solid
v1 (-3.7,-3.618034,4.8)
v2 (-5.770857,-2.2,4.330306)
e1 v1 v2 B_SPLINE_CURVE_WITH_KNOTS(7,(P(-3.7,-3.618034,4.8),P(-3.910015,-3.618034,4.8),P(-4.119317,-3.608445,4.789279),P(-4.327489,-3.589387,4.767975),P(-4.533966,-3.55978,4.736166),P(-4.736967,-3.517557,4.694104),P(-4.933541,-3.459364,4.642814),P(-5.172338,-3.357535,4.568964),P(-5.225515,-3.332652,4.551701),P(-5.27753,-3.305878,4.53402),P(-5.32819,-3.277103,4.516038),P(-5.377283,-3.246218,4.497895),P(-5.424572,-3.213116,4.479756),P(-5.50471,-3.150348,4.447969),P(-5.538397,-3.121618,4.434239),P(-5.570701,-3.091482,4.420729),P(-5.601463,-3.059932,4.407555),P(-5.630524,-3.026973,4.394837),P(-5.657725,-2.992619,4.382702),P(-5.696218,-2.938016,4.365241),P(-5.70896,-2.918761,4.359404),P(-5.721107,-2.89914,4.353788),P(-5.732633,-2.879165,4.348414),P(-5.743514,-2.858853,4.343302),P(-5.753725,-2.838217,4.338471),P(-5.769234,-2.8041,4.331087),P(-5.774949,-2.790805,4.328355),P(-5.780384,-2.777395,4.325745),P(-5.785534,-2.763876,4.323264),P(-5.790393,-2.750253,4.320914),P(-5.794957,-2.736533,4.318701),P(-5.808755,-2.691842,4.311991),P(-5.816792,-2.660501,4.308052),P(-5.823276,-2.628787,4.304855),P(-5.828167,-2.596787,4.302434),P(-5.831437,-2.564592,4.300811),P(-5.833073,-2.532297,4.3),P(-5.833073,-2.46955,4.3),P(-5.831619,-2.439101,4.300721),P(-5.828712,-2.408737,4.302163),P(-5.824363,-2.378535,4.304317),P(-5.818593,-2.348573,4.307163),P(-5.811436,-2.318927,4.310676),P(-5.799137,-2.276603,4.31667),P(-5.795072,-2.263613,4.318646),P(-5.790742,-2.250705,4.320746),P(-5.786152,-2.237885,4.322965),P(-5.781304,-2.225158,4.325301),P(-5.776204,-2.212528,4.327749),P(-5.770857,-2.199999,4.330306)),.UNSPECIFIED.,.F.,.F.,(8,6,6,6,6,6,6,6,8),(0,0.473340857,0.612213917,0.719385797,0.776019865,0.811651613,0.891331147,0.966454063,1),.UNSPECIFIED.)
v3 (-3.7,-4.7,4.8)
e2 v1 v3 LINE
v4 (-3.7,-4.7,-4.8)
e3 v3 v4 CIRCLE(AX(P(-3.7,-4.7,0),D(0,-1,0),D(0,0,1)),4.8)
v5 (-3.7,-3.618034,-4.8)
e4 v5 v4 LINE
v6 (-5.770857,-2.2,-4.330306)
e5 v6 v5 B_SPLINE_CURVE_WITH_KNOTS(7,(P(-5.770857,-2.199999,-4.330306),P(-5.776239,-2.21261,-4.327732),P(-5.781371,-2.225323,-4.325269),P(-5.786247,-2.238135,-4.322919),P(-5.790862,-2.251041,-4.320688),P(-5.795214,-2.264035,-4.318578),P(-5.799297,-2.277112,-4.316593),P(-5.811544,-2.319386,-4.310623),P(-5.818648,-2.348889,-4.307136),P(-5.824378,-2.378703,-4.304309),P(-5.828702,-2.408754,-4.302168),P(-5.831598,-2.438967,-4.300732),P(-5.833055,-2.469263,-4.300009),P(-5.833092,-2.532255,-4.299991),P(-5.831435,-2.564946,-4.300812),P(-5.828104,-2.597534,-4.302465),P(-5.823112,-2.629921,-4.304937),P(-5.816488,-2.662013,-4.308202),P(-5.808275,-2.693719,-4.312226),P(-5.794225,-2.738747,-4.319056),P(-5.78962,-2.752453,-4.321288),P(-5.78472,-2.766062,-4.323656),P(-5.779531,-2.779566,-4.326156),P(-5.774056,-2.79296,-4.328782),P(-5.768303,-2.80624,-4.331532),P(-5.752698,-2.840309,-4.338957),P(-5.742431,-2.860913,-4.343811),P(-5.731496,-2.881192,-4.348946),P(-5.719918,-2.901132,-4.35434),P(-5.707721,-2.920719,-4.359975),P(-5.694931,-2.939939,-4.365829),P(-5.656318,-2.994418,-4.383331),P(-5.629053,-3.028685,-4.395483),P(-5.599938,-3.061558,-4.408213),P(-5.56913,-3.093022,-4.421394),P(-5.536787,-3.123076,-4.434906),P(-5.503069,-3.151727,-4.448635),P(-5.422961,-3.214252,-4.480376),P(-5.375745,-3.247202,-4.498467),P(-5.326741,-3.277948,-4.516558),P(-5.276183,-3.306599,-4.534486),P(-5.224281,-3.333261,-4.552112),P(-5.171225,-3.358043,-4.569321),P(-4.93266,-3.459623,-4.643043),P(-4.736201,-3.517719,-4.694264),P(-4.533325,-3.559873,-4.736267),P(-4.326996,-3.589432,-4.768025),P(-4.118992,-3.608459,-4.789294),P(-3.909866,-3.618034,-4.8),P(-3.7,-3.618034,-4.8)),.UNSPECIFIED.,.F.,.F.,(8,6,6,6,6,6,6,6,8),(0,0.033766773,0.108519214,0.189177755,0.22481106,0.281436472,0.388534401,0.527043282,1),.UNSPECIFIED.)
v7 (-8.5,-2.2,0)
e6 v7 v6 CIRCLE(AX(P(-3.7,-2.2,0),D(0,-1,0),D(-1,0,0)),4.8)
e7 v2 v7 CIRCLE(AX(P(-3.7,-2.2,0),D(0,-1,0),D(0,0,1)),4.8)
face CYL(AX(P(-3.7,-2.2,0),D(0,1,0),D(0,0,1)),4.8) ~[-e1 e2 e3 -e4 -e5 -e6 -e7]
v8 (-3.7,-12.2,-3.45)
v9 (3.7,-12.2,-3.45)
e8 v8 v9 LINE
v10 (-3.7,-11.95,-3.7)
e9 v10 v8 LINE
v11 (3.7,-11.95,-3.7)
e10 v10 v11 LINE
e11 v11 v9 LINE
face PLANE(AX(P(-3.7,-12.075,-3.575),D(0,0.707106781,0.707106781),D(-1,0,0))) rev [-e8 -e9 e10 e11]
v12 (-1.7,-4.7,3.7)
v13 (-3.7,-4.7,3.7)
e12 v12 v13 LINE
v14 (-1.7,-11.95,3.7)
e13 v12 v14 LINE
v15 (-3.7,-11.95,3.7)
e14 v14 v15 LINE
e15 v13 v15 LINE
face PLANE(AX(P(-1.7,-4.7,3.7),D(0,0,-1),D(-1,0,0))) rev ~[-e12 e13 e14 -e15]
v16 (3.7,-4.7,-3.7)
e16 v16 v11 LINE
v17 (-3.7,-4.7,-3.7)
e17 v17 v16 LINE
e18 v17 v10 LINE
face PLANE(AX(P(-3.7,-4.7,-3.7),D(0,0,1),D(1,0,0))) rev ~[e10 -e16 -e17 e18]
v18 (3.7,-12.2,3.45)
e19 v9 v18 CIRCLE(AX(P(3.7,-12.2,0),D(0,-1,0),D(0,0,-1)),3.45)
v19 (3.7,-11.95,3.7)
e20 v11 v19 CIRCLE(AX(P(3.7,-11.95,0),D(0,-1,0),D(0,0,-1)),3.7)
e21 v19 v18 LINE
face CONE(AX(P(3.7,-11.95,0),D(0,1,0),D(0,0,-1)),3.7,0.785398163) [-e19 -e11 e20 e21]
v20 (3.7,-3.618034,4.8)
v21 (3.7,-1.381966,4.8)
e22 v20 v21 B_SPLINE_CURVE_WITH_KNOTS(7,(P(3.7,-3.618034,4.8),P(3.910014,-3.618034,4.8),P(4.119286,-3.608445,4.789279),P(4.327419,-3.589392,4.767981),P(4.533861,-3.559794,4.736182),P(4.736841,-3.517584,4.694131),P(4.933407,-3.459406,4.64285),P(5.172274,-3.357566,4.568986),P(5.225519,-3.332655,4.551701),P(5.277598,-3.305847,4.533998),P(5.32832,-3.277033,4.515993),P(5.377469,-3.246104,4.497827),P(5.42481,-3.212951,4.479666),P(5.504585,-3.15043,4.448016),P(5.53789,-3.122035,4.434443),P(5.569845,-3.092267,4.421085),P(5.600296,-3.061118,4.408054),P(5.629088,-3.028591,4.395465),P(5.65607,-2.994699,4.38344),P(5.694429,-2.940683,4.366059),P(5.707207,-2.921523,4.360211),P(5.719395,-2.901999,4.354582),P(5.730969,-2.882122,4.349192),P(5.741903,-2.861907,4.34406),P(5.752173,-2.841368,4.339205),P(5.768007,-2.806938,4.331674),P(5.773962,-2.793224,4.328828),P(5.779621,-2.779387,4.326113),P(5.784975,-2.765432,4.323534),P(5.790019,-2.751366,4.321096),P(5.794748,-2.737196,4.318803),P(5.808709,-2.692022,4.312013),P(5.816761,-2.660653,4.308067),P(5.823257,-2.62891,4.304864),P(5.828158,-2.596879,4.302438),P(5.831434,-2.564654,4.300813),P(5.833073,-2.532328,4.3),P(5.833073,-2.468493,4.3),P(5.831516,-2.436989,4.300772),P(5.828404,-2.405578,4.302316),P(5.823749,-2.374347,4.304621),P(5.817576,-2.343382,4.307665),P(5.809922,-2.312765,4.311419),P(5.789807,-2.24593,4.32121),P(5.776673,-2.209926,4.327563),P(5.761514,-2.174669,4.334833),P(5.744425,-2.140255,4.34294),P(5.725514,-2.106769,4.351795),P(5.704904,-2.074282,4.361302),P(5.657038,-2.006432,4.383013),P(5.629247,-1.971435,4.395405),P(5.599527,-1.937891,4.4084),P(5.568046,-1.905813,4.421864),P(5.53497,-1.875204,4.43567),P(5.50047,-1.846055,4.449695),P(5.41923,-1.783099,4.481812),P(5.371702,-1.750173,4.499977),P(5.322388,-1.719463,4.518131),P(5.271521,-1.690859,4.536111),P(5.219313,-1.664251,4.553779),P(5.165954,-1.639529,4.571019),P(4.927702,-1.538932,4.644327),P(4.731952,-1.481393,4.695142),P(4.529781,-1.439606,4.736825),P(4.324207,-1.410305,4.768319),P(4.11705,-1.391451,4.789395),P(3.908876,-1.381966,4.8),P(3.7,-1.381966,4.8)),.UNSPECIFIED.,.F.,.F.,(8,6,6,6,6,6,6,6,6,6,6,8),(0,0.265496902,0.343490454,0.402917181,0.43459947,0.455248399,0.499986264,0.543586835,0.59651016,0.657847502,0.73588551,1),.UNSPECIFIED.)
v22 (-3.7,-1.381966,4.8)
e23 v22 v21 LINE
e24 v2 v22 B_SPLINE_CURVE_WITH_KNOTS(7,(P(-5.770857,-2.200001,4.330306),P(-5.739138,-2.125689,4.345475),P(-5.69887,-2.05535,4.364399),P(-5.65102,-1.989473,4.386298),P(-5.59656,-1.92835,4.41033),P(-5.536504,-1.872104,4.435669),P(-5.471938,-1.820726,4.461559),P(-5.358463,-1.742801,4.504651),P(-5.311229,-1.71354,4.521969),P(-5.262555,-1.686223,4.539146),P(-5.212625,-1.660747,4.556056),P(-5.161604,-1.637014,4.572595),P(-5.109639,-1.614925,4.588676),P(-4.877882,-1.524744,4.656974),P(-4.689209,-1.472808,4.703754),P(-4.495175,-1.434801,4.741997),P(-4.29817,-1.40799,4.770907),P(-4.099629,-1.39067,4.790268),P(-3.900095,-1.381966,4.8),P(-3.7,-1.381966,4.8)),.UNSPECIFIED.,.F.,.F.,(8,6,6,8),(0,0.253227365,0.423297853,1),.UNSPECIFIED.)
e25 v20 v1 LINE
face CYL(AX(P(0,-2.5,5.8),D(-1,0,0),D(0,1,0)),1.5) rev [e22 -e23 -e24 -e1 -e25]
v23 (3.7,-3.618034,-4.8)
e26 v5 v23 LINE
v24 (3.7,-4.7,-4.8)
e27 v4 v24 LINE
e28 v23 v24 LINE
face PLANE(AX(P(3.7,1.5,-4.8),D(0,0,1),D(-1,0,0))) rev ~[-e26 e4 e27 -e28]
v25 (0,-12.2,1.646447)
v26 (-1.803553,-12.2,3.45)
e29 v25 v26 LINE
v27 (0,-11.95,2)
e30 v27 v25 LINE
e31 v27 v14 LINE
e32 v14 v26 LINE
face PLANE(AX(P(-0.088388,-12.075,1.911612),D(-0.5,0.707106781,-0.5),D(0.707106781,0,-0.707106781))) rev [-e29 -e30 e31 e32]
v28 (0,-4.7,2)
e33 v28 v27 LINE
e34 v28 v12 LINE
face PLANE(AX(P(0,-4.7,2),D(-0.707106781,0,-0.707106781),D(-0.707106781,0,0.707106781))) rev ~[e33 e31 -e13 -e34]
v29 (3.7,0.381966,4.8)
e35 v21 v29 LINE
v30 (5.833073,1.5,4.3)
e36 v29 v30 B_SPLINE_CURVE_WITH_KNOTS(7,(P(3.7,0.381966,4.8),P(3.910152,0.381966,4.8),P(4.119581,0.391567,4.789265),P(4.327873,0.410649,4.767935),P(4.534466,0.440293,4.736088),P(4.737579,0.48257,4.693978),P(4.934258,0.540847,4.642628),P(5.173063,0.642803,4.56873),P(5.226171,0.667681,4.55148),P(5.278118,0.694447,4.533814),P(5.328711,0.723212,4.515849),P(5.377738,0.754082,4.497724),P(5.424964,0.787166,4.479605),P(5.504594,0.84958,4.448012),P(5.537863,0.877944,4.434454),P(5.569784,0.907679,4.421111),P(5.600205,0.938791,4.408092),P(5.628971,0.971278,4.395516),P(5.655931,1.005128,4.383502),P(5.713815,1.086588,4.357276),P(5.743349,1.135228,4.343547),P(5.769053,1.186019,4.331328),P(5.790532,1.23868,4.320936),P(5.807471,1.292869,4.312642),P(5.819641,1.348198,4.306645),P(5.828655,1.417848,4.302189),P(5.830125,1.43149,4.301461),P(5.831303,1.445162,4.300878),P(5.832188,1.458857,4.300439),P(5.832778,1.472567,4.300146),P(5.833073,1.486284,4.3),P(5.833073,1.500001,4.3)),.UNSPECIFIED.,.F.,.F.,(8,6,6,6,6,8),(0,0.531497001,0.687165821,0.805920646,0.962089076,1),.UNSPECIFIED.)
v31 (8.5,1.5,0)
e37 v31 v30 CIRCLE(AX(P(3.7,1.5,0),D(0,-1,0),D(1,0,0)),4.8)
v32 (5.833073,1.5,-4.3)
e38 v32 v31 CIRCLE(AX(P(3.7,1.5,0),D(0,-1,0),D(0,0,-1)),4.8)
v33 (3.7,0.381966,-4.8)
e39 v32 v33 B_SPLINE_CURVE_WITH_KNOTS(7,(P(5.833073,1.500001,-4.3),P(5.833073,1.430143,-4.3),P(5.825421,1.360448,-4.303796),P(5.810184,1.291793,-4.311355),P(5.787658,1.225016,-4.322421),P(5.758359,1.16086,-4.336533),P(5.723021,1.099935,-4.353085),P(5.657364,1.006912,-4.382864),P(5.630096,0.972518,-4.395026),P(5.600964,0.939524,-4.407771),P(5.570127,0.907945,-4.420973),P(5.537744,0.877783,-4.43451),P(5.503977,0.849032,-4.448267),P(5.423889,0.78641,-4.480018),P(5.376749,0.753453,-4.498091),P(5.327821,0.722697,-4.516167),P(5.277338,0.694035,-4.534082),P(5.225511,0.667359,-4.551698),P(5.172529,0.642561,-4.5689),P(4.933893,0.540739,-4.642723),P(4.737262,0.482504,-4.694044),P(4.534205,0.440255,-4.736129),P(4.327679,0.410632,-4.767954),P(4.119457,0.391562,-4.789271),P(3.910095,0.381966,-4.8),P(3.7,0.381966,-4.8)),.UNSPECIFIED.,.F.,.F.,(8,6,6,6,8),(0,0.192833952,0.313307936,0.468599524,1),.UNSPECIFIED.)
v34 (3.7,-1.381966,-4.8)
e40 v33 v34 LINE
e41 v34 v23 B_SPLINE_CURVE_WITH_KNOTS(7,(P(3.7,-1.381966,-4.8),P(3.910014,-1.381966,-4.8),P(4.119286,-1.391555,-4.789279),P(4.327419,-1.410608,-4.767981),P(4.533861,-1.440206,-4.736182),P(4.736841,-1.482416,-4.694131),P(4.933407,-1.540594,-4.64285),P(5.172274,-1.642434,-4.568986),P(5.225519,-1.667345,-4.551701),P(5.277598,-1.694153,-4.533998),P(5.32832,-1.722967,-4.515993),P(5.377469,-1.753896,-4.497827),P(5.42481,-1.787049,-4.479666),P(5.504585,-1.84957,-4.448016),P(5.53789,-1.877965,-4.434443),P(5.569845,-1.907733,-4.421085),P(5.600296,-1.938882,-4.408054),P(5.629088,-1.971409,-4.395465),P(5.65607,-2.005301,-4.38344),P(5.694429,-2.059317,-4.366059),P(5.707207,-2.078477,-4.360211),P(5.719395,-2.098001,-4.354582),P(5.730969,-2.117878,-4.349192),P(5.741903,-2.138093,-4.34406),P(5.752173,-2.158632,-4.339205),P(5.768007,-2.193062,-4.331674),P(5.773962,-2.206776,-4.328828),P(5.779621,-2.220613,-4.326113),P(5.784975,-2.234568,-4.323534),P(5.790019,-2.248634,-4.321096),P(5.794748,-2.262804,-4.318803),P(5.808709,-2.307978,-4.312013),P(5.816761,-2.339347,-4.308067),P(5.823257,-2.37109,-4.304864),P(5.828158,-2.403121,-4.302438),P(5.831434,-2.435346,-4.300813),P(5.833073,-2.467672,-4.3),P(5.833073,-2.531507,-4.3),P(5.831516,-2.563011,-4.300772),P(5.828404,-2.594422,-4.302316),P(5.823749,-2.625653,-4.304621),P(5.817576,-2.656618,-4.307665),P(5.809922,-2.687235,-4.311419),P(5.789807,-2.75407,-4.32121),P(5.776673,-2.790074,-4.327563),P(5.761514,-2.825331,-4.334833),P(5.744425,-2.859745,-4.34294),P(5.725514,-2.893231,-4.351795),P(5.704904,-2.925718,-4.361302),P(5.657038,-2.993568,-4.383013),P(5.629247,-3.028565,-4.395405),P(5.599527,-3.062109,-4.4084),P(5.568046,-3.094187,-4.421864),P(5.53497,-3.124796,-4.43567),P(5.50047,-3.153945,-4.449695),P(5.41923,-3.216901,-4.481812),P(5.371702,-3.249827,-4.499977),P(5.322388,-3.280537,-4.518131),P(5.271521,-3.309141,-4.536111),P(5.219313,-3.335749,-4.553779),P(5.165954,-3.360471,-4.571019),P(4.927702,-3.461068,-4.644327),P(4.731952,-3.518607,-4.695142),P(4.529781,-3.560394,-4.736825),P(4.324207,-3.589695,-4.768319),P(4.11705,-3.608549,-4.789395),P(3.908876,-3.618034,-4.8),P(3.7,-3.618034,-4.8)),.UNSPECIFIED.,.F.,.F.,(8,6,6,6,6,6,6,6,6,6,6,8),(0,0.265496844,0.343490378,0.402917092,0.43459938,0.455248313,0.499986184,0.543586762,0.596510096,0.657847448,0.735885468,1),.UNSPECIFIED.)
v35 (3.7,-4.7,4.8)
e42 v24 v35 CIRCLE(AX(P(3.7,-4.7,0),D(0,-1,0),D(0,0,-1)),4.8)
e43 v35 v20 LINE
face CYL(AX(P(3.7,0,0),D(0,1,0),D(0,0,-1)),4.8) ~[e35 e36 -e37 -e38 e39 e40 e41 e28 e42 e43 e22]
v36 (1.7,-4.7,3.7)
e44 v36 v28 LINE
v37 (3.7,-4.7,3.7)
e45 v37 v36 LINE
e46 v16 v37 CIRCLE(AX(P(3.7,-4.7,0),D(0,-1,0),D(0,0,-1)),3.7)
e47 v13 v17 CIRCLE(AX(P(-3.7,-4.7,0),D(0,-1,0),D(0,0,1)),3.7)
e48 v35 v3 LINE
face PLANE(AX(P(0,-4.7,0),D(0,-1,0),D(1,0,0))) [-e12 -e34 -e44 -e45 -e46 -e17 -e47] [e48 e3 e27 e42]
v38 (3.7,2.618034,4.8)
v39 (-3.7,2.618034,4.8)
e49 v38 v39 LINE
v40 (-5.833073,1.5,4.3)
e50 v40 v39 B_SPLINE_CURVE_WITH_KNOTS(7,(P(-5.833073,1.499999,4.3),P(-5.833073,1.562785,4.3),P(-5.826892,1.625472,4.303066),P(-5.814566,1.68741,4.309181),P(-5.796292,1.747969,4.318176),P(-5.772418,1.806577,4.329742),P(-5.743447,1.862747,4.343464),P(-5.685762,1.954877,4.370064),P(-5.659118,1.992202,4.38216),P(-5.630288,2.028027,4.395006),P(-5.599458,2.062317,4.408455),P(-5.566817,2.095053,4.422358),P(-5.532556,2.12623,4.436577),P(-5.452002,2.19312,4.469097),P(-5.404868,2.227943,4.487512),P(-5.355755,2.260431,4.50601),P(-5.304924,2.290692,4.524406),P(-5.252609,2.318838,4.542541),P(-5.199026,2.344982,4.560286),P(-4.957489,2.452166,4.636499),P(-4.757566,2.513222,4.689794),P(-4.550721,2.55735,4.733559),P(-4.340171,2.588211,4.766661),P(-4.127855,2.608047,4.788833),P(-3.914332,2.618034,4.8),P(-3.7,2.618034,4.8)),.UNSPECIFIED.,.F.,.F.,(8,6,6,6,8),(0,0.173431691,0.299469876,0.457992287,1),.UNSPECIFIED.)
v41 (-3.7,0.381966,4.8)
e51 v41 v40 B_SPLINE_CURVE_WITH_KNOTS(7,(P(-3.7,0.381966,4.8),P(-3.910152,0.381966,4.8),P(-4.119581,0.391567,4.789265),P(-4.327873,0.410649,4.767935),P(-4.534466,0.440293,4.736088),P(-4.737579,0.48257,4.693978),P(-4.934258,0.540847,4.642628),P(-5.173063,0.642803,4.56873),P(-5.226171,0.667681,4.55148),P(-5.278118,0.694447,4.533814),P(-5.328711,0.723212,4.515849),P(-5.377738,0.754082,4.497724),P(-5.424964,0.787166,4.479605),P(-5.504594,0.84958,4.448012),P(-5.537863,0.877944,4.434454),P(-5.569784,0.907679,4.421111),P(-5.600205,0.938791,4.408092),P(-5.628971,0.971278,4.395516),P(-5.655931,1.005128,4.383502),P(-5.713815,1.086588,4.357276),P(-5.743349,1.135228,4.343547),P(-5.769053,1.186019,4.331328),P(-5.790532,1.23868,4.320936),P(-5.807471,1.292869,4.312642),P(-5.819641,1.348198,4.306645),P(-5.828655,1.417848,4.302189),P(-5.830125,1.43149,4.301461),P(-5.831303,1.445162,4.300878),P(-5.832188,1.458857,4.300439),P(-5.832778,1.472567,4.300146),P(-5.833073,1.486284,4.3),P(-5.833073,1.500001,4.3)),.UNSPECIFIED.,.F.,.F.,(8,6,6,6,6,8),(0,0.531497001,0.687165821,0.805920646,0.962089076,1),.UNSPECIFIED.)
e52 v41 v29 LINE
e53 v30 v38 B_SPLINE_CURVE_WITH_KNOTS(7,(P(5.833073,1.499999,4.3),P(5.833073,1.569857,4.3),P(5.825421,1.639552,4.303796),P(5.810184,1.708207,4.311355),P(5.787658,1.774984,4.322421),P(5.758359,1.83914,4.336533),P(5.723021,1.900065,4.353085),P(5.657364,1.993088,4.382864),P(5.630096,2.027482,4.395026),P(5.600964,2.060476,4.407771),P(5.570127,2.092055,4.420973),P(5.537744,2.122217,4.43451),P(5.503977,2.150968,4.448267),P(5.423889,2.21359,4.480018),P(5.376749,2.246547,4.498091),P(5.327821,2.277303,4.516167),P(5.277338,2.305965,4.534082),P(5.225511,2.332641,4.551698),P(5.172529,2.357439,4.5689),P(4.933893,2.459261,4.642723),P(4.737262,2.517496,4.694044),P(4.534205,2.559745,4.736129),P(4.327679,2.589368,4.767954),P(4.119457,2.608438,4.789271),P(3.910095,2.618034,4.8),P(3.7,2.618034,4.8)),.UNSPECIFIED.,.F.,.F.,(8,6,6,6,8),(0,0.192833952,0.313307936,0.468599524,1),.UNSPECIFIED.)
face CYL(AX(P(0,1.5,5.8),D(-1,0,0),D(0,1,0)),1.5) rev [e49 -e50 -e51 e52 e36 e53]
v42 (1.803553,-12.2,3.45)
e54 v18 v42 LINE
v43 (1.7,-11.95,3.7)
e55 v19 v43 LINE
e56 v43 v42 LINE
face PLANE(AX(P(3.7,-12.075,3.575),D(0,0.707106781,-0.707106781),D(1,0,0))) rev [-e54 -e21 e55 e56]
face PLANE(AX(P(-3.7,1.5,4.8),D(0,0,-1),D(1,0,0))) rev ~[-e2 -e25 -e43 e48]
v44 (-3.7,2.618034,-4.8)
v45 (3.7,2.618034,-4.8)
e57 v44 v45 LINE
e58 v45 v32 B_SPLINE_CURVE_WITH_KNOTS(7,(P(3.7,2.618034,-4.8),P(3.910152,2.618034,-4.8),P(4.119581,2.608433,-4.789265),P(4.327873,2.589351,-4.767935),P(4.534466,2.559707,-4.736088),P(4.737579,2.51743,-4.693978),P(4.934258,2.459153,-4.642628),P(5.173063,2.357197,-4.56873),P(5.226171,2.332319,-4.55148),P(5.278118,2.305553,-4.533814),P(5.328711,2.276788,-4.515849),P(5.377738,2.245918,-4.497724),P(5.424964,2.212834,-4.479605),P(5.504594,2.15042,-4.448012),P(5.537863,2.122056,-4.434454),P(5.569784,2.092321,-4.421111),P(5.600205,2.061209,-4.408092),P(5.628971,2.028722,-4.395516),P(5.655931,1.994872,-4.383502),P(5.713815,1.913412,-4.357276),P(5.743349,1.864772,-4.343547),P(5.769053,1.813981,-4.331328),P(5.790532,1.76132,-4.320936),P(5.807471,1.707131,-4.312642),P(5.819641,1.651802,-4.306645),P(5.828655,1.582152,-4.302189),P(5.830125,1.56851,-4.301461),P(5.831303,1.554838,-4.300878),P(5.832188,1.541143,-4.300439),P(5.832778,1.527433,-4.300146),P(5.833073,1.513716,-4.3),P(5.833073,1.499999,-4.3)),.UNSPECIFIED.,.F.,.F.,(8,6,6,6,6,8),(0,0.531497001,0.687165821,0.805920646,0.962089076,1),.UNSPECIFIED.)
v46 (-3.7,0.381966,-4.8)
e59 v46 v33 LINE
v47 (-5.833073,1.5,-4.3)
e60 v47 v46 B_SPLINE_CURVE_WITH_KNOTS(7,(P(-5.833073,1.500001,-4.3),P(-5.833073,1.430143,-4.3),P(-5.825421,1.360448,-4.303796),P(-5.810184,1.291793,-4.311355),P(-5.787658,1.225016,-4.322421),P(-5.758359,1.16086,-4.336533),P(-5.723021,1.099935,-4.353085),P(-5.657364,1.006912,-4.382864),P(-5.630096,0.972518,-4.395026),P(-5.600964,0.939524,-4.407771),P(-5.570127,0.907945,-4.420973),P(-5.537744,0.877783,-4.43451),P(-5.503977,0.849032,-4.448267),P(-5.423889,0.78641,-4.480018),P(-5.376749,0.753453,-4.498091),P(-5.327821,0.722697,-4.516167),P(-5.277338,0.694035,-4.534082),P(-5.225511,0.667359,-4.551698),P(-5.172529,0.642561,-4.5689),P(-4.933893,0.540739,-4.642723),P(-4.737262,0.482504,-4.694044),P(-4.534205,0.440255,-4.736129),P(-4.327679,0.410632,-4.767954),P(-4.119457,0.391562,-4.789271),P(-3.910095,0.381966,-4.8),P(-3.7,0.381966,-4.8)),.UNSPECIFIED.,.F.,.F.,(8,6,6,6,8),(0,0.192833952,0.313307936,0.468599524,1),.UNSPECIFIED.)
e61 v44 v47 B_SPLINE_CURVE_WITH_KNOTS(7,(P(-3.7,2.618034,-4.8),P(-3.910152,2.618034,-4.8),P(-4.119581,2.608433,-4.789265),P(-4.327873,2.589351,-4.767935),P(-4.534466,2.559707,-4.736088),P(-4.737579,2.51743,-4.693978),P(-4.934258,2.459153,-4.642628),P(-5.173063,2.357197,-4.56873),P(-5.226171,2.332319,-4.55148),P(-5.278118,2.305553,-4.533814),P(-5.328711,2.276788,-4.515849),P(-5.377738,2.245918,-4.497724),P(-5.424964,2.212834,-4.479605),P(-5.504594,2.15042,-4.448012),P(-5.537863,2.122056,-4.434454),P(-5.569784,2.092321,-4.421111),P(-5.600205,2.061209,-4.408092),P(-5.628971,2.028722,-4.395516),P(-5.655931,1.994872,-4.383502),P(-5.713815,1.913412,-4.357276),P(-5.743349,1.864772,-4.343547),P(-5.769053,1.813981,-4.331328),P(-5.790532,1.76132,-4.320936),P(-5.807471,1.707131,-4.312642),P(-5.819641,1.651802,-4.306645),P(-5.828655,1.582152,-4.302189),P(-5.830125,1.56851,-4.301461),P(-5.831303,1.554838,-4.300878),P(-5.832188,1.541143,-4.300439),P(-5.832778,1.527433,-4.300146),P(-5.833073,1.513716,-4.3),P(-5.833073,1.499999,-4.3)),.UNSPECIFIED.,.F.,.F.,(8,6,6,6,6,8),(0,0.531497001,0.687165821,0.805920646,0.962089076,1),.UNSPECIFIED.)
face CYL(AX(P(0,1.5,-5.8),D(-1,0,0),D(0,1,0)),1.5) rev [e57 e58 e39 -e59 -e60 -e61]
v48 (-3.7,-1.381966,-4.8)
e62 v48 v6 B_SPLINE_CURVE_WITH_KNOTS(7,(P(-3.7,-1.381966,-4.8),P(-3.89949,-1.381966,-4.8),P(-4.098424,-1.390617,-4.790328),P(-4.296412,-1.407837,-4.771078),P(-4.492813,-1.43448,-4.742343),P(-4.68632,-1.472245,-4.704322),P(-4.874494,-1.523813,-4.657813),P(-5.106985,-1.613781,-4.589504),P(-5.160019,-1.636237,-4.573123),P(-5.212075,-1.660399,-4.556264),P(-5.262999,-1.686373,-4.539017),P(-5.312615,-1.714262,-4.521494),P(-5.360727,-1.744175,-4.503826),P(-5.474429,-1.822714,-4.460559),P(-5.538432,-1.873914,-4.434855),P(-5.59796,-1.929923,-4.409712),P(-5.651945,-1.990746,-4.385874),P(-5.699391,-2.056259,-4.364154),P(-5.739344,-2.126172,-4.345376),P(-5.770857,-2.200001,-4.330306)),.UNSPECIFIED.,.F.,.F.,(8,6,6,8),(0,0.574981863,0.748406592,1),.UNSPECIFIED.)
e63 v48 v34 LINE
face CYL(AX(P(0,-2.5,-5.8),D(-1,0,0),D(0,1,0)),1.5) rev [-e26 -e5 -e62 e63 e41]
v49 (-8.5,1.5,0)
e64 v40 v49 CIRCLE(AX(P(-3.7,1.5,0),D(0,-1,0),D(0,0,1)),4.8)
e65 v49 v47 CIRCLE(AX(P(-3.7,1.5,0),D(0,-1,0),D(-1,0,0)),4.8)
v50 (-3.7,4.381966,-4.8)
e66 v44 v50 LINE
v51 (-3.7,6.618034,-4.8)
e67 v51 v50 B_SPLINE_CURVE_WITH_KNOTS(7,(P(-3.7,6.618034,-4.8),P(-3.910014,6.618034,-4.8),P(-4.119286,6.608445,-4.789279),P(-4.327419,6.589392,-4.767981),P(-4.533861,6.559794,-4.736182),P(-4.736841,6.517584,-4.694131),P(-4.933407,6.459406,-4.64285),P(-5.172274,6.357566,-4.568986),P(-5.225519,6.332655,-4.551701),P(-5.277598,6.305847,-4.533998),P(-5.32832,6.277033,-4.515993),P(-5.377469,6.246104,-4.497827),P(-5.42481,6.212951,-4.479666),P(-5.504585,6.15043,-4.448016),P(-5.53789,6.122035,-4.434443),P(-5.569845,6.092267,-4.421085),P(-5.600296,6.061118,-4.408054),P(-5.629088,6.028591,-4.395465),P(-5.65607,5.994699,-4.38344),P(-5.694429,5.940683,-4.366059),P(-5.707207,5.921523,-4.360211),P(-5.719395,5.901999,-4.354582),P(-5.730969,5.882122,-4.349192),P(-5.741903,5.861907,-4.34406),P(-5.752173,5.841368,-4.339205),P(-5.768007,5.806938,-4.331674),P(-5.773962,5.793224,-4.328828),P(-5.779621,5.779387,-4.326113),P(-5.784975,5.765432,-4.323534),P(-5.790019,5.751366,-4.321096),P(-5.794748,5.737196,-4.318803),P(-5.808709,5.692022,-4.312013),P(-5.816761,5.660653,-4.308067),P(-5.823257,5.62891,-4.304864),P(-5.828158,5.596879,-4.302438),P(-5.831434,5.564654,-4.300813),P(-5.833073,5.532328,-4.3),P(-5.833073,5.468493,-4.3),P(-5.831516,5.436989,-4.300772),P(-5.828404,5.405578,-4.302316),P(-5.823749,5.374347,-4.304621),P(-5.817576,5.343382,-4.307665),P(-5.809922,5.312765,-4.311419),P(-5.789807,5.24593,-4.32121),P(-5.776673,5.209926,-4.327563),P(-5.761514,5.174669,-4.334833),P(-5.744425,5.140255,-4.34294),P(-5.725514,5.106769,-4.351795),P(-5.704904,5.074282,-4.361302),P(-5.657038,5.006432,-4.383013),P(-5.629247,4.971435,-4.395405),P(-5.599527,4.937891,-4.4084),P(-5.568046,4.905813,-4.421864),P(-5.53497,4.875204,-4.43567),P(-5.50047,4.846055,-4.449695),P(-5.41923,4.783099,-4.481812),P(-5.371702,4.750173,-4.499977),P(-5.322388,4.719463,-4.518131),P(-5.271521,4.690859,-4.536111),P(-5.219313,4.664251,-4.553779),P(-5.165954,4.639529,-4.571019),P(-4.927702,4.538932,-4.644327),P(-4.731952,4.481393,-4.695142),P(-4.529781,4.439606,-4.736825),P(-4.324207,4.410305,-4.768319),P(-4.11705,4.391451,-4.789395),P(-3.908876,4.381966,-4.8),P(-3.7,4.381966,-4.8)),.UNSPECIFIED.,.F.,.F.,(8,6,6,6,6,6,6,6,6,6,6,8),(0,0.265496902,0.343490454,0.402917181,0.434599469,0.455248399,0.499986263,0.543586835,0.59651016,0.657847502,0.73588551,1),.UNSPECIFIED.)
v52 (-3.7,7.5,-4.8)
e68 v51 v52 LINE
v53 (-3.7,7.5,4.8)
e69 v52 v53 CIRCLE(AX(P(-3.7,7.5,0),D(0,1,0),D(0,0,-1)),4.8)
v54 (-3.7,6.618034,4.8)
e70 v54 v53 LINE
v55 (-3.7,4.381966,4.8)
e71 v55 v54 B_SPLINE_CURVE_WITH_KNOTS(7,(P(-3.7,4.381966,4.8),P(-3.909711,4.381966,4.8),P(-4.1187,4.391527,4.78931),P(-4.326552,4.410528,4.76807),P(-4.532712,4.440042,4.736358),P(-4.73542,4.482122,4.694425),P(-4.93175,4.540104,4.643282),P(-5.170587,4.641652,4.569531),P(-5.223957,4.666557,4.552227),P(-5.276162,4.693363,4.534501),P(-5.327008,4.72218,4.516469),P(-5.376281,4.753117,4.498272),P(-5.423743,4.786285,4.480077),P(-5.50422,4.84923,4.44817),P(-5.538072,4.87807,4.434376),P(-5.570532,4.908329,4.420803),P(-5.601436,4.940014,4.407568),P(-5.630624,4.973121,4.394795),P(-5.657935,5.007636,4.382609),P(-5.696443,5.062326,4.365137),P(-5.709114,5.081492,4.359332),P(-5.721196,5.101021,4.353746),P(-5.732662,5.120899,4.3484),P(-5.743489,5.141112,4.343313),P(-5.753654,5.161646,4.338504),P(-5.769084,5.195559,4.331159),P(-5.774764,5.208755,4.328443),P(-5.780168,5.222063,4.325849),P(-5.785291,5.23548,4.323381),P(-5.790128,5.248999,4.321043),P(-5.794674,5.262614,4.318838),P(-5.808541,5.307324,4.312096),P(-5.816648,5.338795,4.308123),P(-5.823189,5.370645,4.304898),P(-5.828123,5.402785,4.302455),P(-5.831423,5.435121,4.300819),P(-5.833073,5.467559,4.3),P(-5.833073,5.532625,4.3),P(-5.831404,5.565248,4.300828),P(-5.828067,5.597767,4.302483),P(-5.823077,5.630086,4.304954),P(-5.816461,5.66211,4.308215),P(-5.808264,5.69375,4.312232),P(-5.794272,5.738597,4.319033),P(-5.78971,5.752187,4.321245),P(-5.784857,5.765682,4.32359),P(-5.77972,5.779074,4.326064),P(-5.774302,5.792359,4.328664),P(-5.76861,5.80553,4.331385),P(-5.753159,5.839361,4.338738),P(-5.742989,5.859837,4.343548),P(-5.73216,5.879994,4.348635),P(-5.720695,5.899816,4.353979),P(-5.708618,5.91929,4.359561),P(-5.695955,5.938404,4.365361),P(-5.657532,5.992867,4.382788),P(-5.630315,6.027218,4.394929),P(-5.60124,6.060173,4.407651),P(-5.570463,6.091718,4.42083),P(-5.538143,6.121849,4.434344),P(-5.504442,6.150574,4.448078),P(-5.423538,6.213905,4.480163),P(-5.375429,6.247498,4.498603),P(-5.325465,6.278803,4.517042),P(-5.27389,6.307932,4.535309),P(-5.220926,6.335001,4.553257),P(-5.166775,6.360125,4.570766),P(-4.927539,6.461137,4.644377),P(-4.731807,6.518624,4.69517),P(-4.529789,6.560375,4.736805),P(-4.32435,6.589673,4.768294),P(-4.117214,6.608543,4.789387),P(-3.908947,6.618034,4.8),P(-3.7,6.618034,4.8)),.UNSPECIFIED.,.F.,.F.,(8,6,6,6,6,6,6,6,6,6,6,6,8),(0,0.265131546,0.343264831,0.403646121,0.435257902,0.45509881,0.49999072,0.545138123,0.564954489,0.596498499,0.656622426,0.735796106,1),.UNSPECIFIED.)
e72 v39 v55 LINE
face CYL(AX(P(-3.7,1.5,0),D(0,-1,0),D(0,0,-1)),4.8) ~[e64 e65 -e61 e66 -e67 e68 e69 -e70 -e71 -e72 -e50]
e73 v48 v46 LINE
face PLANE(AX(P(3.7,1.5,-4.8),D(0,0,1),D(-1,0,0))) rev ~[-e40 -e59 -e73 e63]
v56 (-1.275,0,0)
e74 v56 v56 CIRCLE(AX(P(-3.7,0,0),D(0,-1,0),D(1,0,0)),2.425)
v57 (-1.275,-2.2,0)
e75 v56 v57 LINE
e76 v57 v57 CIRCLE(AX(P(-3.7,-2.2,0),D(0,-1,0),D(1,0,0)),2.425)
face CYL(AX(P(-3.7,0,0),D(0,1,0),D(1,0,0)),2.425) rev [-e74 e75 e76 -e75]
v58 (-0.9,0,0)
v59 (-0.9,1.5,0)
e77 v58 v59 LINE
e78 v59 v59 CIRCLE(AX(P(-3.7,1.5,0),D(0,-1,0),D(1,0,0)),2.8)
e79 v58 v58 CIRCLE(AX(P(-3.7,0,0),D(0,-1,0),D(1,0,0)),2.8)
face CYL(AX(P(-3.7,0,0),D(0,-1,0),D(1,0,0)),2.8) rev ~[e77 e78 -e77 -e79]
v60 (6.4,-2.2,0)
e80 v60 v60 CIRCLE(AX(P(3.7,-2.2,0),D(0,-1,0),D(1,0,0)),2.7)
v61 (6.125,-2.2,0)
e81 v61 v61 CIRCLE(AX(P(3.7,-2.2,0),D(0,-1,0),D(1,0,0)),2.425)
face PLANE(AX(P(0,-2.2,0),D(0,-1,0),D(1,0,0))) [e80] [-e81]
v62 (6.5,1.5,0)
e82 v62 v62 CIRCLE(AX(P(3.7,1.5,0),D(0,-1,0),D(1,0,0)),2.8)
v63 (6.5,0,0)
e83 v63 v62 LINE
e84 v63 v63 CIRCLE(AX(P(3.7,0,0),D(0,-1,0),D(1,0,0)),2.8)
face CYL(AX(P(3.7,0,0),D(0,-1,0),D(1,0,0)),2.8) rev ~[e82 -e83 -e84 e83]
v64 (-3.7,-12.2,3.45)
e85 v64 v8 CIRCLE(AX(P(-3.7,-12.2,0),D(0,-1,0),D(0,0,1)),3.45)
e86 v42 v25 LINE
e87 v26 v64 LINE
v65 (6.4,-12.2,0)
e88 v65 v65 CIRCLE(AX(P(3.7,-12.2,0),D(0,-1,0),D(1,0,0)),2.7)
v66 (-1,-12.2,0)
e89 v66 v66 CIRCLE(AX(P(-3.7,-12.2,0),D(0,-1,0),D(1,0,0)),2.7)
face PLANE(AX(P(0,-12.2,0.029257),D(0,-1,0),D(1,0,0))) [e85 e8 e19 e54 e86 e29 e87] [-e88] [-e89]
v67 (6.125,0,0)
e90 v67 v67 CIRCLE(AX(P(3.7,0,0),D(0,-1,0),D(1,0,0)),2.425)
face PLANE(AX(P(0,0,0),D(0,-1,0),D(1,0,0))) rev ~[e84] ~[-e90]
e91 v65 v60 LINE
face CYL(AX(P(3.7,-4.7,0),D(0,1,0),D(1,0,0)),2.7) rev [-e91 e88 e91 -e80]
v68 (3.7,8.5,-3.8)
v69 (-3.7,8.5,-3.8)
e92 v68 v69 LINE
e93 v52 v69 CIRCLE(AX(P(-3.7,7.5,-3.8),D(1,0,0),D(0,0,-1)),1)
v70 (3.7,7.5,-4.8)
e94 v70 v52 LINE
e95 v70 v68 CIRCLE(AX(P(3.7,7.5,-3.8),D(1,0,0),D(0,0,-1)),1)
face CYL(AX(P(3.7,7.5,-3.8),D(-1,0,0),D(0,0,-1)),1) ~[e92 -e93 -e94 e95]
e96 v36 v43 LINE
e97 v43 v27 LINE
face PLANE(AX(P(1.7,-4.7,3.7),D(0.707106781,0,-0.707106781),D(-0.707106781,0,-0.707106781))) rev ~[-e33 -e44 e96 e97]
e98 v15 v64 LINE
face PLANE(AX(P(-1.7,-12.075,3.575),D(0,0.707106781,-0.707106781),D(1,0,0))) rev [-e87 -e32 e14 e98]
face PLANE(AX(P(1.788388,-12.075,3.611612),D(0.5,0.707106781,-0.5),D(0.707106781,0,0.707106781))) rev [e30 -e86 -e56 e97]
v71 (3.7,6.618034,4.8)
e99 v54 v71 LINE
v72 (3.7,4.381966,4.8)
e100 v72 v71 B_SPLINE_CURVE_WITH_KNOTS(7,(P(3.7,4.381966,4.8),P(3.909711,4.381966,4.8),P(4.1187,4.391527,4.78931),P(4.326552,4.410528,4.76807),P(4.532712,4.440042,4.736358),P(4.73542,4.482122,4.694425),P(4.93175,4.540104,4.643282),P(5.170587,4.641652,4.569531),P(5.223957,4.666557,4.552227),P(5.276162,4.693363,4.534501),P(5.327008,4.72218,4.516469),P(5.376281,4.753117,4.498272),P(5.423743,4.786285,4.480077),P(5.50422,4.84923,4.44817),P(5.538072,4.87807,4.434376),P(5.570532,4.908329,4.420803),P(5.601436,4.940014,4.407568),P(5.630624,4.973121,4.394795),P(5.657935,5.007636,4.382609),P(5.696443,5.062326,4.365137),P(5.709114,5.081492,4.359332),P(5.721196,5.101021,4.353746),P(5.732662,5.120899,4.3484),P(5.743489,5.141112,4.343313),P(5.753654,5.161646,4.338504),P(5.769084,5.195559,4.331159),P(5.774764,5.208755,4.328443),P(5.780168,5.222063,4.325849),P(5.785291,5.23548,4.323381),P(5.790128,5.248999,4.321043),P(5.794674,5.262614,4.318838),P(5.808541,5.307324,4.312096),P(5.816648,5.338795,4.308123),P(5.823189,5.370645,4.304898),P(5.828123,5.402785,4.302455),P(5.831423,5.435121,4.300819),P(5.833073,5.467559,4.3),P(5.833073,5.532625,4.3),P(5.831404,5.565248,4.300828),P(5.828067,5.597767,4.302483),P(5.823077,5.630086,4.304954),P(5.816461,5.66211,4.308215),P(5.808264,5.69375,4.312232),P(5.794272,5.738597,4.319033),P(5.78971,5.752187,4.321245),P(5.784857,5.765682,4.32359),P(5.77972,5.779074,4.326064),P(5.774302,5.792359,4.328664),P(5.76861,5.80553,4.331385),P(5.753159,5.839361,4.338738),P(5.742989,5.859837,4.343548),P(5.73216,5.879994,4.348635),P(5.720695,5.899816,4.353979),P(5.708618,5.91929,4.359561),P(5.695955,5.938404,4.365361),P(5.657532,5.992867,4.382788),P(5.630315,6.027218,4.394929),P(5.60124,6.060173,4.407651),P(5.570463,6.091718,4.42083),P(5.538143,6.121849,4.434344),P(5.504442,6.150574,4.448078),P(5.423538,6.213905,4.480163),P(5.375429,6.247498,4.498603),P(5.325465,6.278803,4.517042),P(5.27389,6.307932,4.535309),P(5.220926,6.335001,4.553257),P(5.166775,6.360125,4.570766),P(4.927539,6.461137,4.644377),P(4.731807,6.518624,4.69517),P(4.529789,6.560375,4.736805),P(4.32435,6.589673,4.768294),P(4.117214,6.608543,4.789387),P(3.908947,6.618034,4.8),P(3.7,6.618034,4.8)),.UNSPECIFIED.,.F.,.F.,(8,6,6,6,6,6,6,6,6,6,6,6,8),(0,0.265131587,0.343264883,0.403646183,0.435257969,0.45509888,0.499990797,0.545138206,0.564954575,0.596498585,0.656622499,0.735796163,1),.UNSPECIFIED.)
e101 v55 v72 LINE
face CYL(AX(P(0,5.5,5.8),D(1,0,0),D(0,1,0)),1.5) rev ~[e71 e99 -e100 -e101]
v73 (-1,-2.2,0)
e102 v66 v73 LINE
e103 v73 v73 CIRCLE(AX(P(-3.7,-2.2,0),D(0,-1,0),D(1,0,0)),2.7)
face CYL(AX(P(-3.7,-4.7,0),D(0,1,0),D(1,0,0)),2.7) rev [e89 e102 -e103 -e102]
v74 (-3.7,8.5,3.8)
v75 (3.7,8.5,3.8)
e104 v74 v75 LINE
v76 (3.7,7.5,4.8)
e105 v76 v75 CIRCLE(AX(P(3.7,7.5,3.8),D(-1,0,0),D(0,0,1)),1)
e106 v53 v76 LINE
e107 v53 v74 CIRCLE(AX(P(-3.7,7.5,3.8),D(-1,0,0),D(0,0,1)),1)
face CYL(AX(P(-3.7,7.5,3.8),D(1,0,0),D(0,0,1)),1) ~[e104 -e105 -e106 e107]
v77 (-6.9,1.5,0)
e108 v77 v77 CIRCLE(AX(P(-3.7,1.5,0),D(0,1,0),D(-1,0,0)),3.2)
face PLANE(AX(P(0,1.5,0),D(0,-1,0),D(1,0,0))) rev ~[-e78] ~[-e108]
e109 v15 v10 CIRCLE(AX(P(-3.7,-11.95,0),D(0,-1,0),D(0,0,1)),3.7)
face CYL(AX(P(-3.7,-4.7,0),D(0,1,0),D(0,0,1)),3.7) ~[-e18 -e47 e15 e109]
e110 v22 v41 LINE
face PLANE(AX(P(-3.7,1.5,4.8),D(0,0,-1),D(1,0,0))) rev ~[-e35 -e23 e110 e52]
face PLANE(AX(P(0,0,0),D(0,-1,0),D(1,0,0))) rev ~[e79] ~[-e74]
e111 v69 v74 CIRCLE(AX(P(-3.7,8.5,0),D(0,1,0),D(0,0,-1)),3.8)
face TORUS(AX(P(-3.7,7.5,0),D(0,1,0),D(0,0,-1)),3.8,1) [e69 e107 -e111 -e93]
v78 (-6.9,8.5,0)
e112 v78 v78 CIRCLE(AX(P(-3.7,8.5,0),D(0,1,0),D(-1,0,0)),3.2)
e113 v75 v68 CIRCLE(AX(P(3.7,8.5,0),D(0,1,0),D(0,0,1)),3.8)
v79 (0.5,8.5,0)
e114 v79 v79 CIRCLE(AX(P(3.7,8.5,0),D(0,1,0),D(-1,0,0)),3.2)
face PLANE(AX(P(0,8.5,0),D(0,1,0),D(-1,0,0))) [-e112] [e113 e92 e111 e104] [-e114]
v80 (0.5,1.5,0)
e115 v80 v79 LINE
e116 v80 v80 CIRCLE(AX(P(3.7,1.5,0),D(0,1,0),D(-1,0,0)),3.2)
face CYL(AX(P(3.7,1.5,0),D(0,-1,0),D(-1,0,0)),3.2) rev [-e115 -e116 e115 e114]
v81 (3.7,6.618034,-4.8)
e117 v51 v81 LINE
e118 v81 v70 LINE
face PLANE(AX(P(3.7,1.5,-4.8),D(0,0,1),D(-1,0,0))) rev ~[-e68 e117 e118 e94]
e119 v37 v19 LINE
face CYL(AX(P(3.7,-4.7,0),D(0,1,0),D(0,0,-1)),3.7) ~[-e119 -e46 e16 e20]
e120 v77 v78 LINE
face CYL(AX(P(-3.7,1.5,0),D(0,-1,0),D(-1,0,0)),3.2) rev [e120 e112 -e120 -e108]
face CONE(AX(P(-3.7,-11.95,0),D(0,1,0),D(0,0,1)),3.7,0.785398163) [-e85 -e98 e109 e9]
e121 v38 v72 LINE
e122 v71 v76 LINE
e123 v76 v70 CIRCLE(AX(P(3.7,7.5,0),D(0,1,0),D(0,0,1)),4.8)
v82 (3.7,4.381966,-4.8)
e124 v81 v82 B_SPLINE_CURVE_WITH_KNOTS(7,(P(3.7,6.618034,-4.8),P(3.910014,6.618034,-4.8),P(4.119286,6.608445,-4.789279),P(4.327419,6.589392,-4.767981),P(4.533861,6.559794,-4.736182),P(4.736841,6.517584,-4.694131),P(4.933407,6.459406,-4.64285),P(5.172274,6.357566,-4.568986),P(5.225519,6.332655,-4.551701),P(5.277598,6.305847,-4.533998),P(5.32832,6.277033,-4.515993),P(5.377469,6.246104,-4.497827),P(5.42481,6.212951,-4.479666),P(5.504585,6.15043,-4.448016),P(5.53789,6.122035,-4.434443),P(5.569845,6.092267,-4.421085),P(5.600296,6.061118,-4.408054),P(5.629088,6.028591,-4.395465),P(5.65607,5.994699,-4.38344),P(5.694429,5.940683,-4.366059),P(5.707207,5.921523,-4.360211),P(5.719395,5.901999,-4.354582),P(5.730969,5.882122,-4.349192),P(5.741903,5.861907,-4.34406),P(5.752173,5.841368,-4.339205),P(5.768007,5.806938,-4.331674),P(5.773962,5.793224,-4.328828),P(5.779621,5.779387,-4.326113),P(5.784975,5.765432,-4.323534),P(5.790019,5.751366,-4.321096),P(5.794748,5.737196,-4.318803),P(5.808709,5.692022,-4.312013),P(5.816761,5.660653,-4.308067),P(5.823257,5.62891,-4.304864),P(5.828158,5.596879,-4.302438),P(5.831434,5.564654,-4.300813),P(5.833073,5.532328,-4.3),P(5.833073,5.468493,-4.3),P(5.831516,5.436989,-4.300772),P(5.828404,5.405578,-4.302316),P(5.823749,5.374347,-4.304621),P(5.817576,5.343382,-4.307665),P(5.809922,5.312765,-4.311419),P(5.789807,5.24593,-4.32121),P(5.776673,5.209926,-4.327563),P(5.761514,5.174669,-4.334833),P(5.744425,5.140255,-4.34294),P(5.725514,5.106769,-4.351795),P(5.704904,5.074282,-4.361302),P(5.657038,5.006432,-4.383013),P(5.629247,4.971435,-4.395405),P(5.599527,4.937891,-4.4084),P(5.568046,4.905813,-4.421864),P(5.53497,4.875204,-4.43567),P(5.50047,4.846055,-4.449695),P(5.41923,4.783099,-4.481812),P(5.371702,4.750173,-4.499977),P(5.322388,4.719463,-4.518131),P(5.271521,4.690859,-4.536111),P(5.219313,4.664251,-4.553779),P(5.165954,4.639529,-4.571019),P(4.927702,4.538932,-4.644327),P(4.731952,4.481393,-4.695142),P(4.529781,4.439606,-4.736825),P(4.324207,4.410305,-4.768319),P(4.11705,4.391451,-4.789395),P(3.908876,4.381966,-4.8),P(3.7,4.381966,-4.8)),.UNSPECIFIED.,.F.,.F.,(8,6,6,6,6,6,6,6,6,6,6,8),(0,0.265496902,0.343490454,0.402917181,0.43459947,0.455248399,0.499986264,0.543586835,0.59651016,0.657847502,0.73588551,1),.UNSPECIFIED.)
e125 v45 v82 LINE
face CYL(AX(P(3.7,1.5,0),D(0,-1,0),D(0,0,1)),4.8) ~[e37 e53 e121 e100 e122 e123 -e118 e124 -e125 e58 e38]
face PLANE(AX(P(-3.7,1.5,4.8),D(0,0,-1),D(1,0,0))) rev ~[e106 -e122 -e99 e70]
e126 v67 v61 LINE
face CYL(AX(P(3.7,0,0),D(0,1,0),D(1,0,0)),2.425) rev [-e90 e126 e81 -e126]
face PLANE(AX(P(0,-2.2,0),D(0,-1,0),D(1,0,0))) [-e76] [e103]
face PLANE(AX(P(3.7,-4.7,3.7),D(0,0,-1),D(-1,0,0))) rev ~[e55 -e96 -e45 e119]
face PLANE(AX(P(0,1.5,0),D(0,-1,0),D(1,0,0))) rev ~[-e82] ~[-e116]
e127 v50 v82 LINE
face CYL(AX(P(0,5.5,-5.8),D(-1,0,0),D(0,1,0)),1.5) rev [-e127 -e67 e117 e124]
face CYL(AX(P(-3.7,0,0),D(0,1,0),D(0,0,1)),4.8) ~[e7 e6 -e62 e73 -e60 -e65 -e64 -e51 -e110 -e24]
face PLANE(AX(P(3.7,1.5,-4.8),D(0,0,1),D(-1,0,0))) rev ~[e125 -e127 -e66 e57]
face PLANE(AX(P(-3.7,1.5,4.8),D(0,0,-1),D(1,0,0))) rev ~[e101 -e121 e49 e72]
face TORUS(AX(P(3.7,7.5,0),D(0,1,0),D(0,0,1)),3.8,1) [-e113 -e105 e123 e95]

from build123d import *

# Parameters (mm, degrees)
F0_R      = 2.8
F1_DEPTH  = 1.5
F0_R_2    = 2.425
F2_DEPTH  = 2.2
F3_R      = 2.7
F4_DEPTH  = 2.5
F5_R      = 2.7
F6_DEPTH  = 7.5
F7_R      = 3.2
F8_DEPTH  = 7
F9_R      = 1
F10_SIZE  = 0.25
F11_R     = 1.5
F12_DEPTH = 8.5


# Not quite as in the source:
# - a feature names something its author has since deleted; it is built from what else it names


with BuildPart() as f1:
    # F0 (on Front) → F1 (new body)
    with BuildSketch(Plane.XZ):
        with BuildLine():
            Line((0, 4.8), (-3.7, 4.8))
            ThreePointArc((-3.7, 4.8), (-7.0941125497, 3.3941125497), (-8.5, 0))
            ThreePointArc((-8.5, 0), (-7.0941125497, -3.3941125497), (-3.7, -4.8))
            Line((-3.7, -4.8), (0, -4.8))
            Line((0, -4.8), (3.7, -4.8))
            ThreePointArc((3.7, -4.8), (7.0941125497, -3.3941125497), (8.5, 0))
            ThreePointArc((8.5, 0), (7.0941125497, 3.3941125497), (3.7, 4.8))
            Line((3.7, 4.8), (0, 4.8))
        make_face()
        with Locations((-3.7, 0)):
            Circle(F0_R, mode=Mode.SUBTRACT)
        with Locations((3.7, 0)):
            Circle(F0_R, mode=Mode.SUBTRACT)
    extrude(amount=-F1_DEPTH)

    # F0 (on Front) → F2 (join)
    with BuildSketch(Plane.XZ):
        with BuildLine():
            Line((0, 4.8), (-3.7, 4.8))
            ThreePointArc((-3.7, 4.8), (-7.0941125497, 3.3941125497), (-8.5, 0))
            ThreePointArc((-8.5, 0), (-7.0941125497, -3.3941125497), (-3.7, -4.8))
            Line((-3.7, -4.8), (0, -4.8))
            Line((0, -4.8), (3.7, -4.8))
            ThreePointArc((3.7, -4.8), (7.0941125497, -3.3941125497), (8.5, 0))
            ThreePointArc((8.5, 0), (7.0941125497, 3.3941125497), (3.7, 4.8))
            Line((3.7, 4.8), (0, 4.8))
        make_face()
        with Locations((-3.7, 0)):
            Circle(F0_R, mode=Mode.SUBTRACT)
        with Locations((3.7, 0)):
            Circle(F0_R, mode=Mode.SUBTRACT)
        with Locations((-3.7, 0)):
            Circle(F0_R)
        with Locations((-3.7, 0)):
            Circle(F0_R_2, mode=Mode.SUBTRACT)
        with Locations((3.7, 0)):
            Circle(F0_R)
        with Locations((3.7, 0)):
            Circle(F0_R_2, mode=Mode.SUBTRACT)
    extrude(amount=F2_DEPTH)

    # F3 (on face) → F4 (join)
    with BuildSketch(Plane.XZ.offset(2.2)):
        with BuildLine():
            ThreePointArc((3.7, -4.8), (8.5, 0), (3.7, 4.8))
            Line((3.7, 4.8), (-3.7, 4.8))
            ThreePointArc((-3.7, 4.8), (-8.5, 0), (-3.7, -4.8))
            Line((-3.7, -4.8), (3.7, -4.8))
        make_face()
        with Locations((-3.7, 0)):
            Circle(F3_R, mode=Mode.SUBTRACT)
        with Locations((3.7, 0)):
            Circle(F3_R, mode=Mode.SUBTRACT)
    extrude(amount=F4_DEPTH)

    # F5 (on face) → F6 (join)
    with BuildSketch(Plane.XZ.offset(4.7)):
        with BuildLine():
            ThreePointArc((-3.7, 3.7), (-7.4, 0), (-3.7, -3.7))
            Line((-3.7, -3.7), (0, -3.7))
            Line((0, -3.7), (3.7, -3.7))
            ThreePointArc((3.7, -3.7), (7.4, 0), (3.7, 3.7))
            Line((3.7, 3.7), (1.7, 3.7))
            Line((1.7, 3.7), (0, 2))
            Line((0, 2), (-1.7, 3.7))
            Line((-1.7, 3.7), (-3.7, 3.7))
        make_face()
        with Locations((-3.7, 0)):
            Circle(F5_R, mode=Mode.SUBTRACT)
        with Locations((3.7, 0)):
            Circle(F5_R, mode=Mode.SUBTRACT)
    extrude(amount=F6_DEPTH)

    # F7 (on face) → F8 (join)
    with BuildSketch(Plane(origin=(0, 1.5, 0), x_dir=(-1, 0, 0), z_dir=(0, 1, 0))):
        with BuildLine():
            ThreePointArc((3.7, -4.8), (8.5, 0), (3.7, 4.8))
            Line((3.7, 4.8), (-3.7, 4.8))
            ThreePointArc((-3.7, 4.8), (-8.5, 0), (-3.7, -4.8))
            Line((-3.7, -4.8), (3.7, -4.8))
        make_face()
        with Locations((-3.7, 0)):
            Circle(F7_R, mode=Mode.SUBTRACT)
        with Locations((3.7, 0)):
            Circle(F7_R, mode=Mode.SUBTRACT)
    extrude(amount=F8_DEPTH)

    # F9
    f9_edges = [f1.edges().sort_by_distance(p)[0] for p in [
        (0, 8.5, 4.8),
    ]]
    fillet(f9_edges, radius=F9_R)

    # F10
    f10_edges = [f1.edges().sort_by_distance(p)[0] for p in [
        (-2.7, -12.2, 3.7),
        (-0.85, -12.2, 2.85),
        (0.85, -12.2, 2.85),
    ]]
    chamfer(f10_edges, length=F10_SIZE)

    # F11 (on Right) → F12 (cut, symmetric)
    with BuildSketch(Plane.YZ):
        with Locations((1.5, 5.8)):
            Circle(F11_R)
        with Locations((-2.5, 5.8)):
            Circle(F11_R)
        with Locations((-2.5, -5.8)):
            Circle(F11_R)
        with Locations((1.5, -5.8)):
            Circle(F11_R)
        with Locations((5.5, -5.8)):
            Circle(F11_R)
        with Locations((5.5, 5.8)):
            Circle(F11_R)
    extrude(amount=F12_DEPTH, both=True, mode=Mode.SUBTRACT)


solid = f1.part
